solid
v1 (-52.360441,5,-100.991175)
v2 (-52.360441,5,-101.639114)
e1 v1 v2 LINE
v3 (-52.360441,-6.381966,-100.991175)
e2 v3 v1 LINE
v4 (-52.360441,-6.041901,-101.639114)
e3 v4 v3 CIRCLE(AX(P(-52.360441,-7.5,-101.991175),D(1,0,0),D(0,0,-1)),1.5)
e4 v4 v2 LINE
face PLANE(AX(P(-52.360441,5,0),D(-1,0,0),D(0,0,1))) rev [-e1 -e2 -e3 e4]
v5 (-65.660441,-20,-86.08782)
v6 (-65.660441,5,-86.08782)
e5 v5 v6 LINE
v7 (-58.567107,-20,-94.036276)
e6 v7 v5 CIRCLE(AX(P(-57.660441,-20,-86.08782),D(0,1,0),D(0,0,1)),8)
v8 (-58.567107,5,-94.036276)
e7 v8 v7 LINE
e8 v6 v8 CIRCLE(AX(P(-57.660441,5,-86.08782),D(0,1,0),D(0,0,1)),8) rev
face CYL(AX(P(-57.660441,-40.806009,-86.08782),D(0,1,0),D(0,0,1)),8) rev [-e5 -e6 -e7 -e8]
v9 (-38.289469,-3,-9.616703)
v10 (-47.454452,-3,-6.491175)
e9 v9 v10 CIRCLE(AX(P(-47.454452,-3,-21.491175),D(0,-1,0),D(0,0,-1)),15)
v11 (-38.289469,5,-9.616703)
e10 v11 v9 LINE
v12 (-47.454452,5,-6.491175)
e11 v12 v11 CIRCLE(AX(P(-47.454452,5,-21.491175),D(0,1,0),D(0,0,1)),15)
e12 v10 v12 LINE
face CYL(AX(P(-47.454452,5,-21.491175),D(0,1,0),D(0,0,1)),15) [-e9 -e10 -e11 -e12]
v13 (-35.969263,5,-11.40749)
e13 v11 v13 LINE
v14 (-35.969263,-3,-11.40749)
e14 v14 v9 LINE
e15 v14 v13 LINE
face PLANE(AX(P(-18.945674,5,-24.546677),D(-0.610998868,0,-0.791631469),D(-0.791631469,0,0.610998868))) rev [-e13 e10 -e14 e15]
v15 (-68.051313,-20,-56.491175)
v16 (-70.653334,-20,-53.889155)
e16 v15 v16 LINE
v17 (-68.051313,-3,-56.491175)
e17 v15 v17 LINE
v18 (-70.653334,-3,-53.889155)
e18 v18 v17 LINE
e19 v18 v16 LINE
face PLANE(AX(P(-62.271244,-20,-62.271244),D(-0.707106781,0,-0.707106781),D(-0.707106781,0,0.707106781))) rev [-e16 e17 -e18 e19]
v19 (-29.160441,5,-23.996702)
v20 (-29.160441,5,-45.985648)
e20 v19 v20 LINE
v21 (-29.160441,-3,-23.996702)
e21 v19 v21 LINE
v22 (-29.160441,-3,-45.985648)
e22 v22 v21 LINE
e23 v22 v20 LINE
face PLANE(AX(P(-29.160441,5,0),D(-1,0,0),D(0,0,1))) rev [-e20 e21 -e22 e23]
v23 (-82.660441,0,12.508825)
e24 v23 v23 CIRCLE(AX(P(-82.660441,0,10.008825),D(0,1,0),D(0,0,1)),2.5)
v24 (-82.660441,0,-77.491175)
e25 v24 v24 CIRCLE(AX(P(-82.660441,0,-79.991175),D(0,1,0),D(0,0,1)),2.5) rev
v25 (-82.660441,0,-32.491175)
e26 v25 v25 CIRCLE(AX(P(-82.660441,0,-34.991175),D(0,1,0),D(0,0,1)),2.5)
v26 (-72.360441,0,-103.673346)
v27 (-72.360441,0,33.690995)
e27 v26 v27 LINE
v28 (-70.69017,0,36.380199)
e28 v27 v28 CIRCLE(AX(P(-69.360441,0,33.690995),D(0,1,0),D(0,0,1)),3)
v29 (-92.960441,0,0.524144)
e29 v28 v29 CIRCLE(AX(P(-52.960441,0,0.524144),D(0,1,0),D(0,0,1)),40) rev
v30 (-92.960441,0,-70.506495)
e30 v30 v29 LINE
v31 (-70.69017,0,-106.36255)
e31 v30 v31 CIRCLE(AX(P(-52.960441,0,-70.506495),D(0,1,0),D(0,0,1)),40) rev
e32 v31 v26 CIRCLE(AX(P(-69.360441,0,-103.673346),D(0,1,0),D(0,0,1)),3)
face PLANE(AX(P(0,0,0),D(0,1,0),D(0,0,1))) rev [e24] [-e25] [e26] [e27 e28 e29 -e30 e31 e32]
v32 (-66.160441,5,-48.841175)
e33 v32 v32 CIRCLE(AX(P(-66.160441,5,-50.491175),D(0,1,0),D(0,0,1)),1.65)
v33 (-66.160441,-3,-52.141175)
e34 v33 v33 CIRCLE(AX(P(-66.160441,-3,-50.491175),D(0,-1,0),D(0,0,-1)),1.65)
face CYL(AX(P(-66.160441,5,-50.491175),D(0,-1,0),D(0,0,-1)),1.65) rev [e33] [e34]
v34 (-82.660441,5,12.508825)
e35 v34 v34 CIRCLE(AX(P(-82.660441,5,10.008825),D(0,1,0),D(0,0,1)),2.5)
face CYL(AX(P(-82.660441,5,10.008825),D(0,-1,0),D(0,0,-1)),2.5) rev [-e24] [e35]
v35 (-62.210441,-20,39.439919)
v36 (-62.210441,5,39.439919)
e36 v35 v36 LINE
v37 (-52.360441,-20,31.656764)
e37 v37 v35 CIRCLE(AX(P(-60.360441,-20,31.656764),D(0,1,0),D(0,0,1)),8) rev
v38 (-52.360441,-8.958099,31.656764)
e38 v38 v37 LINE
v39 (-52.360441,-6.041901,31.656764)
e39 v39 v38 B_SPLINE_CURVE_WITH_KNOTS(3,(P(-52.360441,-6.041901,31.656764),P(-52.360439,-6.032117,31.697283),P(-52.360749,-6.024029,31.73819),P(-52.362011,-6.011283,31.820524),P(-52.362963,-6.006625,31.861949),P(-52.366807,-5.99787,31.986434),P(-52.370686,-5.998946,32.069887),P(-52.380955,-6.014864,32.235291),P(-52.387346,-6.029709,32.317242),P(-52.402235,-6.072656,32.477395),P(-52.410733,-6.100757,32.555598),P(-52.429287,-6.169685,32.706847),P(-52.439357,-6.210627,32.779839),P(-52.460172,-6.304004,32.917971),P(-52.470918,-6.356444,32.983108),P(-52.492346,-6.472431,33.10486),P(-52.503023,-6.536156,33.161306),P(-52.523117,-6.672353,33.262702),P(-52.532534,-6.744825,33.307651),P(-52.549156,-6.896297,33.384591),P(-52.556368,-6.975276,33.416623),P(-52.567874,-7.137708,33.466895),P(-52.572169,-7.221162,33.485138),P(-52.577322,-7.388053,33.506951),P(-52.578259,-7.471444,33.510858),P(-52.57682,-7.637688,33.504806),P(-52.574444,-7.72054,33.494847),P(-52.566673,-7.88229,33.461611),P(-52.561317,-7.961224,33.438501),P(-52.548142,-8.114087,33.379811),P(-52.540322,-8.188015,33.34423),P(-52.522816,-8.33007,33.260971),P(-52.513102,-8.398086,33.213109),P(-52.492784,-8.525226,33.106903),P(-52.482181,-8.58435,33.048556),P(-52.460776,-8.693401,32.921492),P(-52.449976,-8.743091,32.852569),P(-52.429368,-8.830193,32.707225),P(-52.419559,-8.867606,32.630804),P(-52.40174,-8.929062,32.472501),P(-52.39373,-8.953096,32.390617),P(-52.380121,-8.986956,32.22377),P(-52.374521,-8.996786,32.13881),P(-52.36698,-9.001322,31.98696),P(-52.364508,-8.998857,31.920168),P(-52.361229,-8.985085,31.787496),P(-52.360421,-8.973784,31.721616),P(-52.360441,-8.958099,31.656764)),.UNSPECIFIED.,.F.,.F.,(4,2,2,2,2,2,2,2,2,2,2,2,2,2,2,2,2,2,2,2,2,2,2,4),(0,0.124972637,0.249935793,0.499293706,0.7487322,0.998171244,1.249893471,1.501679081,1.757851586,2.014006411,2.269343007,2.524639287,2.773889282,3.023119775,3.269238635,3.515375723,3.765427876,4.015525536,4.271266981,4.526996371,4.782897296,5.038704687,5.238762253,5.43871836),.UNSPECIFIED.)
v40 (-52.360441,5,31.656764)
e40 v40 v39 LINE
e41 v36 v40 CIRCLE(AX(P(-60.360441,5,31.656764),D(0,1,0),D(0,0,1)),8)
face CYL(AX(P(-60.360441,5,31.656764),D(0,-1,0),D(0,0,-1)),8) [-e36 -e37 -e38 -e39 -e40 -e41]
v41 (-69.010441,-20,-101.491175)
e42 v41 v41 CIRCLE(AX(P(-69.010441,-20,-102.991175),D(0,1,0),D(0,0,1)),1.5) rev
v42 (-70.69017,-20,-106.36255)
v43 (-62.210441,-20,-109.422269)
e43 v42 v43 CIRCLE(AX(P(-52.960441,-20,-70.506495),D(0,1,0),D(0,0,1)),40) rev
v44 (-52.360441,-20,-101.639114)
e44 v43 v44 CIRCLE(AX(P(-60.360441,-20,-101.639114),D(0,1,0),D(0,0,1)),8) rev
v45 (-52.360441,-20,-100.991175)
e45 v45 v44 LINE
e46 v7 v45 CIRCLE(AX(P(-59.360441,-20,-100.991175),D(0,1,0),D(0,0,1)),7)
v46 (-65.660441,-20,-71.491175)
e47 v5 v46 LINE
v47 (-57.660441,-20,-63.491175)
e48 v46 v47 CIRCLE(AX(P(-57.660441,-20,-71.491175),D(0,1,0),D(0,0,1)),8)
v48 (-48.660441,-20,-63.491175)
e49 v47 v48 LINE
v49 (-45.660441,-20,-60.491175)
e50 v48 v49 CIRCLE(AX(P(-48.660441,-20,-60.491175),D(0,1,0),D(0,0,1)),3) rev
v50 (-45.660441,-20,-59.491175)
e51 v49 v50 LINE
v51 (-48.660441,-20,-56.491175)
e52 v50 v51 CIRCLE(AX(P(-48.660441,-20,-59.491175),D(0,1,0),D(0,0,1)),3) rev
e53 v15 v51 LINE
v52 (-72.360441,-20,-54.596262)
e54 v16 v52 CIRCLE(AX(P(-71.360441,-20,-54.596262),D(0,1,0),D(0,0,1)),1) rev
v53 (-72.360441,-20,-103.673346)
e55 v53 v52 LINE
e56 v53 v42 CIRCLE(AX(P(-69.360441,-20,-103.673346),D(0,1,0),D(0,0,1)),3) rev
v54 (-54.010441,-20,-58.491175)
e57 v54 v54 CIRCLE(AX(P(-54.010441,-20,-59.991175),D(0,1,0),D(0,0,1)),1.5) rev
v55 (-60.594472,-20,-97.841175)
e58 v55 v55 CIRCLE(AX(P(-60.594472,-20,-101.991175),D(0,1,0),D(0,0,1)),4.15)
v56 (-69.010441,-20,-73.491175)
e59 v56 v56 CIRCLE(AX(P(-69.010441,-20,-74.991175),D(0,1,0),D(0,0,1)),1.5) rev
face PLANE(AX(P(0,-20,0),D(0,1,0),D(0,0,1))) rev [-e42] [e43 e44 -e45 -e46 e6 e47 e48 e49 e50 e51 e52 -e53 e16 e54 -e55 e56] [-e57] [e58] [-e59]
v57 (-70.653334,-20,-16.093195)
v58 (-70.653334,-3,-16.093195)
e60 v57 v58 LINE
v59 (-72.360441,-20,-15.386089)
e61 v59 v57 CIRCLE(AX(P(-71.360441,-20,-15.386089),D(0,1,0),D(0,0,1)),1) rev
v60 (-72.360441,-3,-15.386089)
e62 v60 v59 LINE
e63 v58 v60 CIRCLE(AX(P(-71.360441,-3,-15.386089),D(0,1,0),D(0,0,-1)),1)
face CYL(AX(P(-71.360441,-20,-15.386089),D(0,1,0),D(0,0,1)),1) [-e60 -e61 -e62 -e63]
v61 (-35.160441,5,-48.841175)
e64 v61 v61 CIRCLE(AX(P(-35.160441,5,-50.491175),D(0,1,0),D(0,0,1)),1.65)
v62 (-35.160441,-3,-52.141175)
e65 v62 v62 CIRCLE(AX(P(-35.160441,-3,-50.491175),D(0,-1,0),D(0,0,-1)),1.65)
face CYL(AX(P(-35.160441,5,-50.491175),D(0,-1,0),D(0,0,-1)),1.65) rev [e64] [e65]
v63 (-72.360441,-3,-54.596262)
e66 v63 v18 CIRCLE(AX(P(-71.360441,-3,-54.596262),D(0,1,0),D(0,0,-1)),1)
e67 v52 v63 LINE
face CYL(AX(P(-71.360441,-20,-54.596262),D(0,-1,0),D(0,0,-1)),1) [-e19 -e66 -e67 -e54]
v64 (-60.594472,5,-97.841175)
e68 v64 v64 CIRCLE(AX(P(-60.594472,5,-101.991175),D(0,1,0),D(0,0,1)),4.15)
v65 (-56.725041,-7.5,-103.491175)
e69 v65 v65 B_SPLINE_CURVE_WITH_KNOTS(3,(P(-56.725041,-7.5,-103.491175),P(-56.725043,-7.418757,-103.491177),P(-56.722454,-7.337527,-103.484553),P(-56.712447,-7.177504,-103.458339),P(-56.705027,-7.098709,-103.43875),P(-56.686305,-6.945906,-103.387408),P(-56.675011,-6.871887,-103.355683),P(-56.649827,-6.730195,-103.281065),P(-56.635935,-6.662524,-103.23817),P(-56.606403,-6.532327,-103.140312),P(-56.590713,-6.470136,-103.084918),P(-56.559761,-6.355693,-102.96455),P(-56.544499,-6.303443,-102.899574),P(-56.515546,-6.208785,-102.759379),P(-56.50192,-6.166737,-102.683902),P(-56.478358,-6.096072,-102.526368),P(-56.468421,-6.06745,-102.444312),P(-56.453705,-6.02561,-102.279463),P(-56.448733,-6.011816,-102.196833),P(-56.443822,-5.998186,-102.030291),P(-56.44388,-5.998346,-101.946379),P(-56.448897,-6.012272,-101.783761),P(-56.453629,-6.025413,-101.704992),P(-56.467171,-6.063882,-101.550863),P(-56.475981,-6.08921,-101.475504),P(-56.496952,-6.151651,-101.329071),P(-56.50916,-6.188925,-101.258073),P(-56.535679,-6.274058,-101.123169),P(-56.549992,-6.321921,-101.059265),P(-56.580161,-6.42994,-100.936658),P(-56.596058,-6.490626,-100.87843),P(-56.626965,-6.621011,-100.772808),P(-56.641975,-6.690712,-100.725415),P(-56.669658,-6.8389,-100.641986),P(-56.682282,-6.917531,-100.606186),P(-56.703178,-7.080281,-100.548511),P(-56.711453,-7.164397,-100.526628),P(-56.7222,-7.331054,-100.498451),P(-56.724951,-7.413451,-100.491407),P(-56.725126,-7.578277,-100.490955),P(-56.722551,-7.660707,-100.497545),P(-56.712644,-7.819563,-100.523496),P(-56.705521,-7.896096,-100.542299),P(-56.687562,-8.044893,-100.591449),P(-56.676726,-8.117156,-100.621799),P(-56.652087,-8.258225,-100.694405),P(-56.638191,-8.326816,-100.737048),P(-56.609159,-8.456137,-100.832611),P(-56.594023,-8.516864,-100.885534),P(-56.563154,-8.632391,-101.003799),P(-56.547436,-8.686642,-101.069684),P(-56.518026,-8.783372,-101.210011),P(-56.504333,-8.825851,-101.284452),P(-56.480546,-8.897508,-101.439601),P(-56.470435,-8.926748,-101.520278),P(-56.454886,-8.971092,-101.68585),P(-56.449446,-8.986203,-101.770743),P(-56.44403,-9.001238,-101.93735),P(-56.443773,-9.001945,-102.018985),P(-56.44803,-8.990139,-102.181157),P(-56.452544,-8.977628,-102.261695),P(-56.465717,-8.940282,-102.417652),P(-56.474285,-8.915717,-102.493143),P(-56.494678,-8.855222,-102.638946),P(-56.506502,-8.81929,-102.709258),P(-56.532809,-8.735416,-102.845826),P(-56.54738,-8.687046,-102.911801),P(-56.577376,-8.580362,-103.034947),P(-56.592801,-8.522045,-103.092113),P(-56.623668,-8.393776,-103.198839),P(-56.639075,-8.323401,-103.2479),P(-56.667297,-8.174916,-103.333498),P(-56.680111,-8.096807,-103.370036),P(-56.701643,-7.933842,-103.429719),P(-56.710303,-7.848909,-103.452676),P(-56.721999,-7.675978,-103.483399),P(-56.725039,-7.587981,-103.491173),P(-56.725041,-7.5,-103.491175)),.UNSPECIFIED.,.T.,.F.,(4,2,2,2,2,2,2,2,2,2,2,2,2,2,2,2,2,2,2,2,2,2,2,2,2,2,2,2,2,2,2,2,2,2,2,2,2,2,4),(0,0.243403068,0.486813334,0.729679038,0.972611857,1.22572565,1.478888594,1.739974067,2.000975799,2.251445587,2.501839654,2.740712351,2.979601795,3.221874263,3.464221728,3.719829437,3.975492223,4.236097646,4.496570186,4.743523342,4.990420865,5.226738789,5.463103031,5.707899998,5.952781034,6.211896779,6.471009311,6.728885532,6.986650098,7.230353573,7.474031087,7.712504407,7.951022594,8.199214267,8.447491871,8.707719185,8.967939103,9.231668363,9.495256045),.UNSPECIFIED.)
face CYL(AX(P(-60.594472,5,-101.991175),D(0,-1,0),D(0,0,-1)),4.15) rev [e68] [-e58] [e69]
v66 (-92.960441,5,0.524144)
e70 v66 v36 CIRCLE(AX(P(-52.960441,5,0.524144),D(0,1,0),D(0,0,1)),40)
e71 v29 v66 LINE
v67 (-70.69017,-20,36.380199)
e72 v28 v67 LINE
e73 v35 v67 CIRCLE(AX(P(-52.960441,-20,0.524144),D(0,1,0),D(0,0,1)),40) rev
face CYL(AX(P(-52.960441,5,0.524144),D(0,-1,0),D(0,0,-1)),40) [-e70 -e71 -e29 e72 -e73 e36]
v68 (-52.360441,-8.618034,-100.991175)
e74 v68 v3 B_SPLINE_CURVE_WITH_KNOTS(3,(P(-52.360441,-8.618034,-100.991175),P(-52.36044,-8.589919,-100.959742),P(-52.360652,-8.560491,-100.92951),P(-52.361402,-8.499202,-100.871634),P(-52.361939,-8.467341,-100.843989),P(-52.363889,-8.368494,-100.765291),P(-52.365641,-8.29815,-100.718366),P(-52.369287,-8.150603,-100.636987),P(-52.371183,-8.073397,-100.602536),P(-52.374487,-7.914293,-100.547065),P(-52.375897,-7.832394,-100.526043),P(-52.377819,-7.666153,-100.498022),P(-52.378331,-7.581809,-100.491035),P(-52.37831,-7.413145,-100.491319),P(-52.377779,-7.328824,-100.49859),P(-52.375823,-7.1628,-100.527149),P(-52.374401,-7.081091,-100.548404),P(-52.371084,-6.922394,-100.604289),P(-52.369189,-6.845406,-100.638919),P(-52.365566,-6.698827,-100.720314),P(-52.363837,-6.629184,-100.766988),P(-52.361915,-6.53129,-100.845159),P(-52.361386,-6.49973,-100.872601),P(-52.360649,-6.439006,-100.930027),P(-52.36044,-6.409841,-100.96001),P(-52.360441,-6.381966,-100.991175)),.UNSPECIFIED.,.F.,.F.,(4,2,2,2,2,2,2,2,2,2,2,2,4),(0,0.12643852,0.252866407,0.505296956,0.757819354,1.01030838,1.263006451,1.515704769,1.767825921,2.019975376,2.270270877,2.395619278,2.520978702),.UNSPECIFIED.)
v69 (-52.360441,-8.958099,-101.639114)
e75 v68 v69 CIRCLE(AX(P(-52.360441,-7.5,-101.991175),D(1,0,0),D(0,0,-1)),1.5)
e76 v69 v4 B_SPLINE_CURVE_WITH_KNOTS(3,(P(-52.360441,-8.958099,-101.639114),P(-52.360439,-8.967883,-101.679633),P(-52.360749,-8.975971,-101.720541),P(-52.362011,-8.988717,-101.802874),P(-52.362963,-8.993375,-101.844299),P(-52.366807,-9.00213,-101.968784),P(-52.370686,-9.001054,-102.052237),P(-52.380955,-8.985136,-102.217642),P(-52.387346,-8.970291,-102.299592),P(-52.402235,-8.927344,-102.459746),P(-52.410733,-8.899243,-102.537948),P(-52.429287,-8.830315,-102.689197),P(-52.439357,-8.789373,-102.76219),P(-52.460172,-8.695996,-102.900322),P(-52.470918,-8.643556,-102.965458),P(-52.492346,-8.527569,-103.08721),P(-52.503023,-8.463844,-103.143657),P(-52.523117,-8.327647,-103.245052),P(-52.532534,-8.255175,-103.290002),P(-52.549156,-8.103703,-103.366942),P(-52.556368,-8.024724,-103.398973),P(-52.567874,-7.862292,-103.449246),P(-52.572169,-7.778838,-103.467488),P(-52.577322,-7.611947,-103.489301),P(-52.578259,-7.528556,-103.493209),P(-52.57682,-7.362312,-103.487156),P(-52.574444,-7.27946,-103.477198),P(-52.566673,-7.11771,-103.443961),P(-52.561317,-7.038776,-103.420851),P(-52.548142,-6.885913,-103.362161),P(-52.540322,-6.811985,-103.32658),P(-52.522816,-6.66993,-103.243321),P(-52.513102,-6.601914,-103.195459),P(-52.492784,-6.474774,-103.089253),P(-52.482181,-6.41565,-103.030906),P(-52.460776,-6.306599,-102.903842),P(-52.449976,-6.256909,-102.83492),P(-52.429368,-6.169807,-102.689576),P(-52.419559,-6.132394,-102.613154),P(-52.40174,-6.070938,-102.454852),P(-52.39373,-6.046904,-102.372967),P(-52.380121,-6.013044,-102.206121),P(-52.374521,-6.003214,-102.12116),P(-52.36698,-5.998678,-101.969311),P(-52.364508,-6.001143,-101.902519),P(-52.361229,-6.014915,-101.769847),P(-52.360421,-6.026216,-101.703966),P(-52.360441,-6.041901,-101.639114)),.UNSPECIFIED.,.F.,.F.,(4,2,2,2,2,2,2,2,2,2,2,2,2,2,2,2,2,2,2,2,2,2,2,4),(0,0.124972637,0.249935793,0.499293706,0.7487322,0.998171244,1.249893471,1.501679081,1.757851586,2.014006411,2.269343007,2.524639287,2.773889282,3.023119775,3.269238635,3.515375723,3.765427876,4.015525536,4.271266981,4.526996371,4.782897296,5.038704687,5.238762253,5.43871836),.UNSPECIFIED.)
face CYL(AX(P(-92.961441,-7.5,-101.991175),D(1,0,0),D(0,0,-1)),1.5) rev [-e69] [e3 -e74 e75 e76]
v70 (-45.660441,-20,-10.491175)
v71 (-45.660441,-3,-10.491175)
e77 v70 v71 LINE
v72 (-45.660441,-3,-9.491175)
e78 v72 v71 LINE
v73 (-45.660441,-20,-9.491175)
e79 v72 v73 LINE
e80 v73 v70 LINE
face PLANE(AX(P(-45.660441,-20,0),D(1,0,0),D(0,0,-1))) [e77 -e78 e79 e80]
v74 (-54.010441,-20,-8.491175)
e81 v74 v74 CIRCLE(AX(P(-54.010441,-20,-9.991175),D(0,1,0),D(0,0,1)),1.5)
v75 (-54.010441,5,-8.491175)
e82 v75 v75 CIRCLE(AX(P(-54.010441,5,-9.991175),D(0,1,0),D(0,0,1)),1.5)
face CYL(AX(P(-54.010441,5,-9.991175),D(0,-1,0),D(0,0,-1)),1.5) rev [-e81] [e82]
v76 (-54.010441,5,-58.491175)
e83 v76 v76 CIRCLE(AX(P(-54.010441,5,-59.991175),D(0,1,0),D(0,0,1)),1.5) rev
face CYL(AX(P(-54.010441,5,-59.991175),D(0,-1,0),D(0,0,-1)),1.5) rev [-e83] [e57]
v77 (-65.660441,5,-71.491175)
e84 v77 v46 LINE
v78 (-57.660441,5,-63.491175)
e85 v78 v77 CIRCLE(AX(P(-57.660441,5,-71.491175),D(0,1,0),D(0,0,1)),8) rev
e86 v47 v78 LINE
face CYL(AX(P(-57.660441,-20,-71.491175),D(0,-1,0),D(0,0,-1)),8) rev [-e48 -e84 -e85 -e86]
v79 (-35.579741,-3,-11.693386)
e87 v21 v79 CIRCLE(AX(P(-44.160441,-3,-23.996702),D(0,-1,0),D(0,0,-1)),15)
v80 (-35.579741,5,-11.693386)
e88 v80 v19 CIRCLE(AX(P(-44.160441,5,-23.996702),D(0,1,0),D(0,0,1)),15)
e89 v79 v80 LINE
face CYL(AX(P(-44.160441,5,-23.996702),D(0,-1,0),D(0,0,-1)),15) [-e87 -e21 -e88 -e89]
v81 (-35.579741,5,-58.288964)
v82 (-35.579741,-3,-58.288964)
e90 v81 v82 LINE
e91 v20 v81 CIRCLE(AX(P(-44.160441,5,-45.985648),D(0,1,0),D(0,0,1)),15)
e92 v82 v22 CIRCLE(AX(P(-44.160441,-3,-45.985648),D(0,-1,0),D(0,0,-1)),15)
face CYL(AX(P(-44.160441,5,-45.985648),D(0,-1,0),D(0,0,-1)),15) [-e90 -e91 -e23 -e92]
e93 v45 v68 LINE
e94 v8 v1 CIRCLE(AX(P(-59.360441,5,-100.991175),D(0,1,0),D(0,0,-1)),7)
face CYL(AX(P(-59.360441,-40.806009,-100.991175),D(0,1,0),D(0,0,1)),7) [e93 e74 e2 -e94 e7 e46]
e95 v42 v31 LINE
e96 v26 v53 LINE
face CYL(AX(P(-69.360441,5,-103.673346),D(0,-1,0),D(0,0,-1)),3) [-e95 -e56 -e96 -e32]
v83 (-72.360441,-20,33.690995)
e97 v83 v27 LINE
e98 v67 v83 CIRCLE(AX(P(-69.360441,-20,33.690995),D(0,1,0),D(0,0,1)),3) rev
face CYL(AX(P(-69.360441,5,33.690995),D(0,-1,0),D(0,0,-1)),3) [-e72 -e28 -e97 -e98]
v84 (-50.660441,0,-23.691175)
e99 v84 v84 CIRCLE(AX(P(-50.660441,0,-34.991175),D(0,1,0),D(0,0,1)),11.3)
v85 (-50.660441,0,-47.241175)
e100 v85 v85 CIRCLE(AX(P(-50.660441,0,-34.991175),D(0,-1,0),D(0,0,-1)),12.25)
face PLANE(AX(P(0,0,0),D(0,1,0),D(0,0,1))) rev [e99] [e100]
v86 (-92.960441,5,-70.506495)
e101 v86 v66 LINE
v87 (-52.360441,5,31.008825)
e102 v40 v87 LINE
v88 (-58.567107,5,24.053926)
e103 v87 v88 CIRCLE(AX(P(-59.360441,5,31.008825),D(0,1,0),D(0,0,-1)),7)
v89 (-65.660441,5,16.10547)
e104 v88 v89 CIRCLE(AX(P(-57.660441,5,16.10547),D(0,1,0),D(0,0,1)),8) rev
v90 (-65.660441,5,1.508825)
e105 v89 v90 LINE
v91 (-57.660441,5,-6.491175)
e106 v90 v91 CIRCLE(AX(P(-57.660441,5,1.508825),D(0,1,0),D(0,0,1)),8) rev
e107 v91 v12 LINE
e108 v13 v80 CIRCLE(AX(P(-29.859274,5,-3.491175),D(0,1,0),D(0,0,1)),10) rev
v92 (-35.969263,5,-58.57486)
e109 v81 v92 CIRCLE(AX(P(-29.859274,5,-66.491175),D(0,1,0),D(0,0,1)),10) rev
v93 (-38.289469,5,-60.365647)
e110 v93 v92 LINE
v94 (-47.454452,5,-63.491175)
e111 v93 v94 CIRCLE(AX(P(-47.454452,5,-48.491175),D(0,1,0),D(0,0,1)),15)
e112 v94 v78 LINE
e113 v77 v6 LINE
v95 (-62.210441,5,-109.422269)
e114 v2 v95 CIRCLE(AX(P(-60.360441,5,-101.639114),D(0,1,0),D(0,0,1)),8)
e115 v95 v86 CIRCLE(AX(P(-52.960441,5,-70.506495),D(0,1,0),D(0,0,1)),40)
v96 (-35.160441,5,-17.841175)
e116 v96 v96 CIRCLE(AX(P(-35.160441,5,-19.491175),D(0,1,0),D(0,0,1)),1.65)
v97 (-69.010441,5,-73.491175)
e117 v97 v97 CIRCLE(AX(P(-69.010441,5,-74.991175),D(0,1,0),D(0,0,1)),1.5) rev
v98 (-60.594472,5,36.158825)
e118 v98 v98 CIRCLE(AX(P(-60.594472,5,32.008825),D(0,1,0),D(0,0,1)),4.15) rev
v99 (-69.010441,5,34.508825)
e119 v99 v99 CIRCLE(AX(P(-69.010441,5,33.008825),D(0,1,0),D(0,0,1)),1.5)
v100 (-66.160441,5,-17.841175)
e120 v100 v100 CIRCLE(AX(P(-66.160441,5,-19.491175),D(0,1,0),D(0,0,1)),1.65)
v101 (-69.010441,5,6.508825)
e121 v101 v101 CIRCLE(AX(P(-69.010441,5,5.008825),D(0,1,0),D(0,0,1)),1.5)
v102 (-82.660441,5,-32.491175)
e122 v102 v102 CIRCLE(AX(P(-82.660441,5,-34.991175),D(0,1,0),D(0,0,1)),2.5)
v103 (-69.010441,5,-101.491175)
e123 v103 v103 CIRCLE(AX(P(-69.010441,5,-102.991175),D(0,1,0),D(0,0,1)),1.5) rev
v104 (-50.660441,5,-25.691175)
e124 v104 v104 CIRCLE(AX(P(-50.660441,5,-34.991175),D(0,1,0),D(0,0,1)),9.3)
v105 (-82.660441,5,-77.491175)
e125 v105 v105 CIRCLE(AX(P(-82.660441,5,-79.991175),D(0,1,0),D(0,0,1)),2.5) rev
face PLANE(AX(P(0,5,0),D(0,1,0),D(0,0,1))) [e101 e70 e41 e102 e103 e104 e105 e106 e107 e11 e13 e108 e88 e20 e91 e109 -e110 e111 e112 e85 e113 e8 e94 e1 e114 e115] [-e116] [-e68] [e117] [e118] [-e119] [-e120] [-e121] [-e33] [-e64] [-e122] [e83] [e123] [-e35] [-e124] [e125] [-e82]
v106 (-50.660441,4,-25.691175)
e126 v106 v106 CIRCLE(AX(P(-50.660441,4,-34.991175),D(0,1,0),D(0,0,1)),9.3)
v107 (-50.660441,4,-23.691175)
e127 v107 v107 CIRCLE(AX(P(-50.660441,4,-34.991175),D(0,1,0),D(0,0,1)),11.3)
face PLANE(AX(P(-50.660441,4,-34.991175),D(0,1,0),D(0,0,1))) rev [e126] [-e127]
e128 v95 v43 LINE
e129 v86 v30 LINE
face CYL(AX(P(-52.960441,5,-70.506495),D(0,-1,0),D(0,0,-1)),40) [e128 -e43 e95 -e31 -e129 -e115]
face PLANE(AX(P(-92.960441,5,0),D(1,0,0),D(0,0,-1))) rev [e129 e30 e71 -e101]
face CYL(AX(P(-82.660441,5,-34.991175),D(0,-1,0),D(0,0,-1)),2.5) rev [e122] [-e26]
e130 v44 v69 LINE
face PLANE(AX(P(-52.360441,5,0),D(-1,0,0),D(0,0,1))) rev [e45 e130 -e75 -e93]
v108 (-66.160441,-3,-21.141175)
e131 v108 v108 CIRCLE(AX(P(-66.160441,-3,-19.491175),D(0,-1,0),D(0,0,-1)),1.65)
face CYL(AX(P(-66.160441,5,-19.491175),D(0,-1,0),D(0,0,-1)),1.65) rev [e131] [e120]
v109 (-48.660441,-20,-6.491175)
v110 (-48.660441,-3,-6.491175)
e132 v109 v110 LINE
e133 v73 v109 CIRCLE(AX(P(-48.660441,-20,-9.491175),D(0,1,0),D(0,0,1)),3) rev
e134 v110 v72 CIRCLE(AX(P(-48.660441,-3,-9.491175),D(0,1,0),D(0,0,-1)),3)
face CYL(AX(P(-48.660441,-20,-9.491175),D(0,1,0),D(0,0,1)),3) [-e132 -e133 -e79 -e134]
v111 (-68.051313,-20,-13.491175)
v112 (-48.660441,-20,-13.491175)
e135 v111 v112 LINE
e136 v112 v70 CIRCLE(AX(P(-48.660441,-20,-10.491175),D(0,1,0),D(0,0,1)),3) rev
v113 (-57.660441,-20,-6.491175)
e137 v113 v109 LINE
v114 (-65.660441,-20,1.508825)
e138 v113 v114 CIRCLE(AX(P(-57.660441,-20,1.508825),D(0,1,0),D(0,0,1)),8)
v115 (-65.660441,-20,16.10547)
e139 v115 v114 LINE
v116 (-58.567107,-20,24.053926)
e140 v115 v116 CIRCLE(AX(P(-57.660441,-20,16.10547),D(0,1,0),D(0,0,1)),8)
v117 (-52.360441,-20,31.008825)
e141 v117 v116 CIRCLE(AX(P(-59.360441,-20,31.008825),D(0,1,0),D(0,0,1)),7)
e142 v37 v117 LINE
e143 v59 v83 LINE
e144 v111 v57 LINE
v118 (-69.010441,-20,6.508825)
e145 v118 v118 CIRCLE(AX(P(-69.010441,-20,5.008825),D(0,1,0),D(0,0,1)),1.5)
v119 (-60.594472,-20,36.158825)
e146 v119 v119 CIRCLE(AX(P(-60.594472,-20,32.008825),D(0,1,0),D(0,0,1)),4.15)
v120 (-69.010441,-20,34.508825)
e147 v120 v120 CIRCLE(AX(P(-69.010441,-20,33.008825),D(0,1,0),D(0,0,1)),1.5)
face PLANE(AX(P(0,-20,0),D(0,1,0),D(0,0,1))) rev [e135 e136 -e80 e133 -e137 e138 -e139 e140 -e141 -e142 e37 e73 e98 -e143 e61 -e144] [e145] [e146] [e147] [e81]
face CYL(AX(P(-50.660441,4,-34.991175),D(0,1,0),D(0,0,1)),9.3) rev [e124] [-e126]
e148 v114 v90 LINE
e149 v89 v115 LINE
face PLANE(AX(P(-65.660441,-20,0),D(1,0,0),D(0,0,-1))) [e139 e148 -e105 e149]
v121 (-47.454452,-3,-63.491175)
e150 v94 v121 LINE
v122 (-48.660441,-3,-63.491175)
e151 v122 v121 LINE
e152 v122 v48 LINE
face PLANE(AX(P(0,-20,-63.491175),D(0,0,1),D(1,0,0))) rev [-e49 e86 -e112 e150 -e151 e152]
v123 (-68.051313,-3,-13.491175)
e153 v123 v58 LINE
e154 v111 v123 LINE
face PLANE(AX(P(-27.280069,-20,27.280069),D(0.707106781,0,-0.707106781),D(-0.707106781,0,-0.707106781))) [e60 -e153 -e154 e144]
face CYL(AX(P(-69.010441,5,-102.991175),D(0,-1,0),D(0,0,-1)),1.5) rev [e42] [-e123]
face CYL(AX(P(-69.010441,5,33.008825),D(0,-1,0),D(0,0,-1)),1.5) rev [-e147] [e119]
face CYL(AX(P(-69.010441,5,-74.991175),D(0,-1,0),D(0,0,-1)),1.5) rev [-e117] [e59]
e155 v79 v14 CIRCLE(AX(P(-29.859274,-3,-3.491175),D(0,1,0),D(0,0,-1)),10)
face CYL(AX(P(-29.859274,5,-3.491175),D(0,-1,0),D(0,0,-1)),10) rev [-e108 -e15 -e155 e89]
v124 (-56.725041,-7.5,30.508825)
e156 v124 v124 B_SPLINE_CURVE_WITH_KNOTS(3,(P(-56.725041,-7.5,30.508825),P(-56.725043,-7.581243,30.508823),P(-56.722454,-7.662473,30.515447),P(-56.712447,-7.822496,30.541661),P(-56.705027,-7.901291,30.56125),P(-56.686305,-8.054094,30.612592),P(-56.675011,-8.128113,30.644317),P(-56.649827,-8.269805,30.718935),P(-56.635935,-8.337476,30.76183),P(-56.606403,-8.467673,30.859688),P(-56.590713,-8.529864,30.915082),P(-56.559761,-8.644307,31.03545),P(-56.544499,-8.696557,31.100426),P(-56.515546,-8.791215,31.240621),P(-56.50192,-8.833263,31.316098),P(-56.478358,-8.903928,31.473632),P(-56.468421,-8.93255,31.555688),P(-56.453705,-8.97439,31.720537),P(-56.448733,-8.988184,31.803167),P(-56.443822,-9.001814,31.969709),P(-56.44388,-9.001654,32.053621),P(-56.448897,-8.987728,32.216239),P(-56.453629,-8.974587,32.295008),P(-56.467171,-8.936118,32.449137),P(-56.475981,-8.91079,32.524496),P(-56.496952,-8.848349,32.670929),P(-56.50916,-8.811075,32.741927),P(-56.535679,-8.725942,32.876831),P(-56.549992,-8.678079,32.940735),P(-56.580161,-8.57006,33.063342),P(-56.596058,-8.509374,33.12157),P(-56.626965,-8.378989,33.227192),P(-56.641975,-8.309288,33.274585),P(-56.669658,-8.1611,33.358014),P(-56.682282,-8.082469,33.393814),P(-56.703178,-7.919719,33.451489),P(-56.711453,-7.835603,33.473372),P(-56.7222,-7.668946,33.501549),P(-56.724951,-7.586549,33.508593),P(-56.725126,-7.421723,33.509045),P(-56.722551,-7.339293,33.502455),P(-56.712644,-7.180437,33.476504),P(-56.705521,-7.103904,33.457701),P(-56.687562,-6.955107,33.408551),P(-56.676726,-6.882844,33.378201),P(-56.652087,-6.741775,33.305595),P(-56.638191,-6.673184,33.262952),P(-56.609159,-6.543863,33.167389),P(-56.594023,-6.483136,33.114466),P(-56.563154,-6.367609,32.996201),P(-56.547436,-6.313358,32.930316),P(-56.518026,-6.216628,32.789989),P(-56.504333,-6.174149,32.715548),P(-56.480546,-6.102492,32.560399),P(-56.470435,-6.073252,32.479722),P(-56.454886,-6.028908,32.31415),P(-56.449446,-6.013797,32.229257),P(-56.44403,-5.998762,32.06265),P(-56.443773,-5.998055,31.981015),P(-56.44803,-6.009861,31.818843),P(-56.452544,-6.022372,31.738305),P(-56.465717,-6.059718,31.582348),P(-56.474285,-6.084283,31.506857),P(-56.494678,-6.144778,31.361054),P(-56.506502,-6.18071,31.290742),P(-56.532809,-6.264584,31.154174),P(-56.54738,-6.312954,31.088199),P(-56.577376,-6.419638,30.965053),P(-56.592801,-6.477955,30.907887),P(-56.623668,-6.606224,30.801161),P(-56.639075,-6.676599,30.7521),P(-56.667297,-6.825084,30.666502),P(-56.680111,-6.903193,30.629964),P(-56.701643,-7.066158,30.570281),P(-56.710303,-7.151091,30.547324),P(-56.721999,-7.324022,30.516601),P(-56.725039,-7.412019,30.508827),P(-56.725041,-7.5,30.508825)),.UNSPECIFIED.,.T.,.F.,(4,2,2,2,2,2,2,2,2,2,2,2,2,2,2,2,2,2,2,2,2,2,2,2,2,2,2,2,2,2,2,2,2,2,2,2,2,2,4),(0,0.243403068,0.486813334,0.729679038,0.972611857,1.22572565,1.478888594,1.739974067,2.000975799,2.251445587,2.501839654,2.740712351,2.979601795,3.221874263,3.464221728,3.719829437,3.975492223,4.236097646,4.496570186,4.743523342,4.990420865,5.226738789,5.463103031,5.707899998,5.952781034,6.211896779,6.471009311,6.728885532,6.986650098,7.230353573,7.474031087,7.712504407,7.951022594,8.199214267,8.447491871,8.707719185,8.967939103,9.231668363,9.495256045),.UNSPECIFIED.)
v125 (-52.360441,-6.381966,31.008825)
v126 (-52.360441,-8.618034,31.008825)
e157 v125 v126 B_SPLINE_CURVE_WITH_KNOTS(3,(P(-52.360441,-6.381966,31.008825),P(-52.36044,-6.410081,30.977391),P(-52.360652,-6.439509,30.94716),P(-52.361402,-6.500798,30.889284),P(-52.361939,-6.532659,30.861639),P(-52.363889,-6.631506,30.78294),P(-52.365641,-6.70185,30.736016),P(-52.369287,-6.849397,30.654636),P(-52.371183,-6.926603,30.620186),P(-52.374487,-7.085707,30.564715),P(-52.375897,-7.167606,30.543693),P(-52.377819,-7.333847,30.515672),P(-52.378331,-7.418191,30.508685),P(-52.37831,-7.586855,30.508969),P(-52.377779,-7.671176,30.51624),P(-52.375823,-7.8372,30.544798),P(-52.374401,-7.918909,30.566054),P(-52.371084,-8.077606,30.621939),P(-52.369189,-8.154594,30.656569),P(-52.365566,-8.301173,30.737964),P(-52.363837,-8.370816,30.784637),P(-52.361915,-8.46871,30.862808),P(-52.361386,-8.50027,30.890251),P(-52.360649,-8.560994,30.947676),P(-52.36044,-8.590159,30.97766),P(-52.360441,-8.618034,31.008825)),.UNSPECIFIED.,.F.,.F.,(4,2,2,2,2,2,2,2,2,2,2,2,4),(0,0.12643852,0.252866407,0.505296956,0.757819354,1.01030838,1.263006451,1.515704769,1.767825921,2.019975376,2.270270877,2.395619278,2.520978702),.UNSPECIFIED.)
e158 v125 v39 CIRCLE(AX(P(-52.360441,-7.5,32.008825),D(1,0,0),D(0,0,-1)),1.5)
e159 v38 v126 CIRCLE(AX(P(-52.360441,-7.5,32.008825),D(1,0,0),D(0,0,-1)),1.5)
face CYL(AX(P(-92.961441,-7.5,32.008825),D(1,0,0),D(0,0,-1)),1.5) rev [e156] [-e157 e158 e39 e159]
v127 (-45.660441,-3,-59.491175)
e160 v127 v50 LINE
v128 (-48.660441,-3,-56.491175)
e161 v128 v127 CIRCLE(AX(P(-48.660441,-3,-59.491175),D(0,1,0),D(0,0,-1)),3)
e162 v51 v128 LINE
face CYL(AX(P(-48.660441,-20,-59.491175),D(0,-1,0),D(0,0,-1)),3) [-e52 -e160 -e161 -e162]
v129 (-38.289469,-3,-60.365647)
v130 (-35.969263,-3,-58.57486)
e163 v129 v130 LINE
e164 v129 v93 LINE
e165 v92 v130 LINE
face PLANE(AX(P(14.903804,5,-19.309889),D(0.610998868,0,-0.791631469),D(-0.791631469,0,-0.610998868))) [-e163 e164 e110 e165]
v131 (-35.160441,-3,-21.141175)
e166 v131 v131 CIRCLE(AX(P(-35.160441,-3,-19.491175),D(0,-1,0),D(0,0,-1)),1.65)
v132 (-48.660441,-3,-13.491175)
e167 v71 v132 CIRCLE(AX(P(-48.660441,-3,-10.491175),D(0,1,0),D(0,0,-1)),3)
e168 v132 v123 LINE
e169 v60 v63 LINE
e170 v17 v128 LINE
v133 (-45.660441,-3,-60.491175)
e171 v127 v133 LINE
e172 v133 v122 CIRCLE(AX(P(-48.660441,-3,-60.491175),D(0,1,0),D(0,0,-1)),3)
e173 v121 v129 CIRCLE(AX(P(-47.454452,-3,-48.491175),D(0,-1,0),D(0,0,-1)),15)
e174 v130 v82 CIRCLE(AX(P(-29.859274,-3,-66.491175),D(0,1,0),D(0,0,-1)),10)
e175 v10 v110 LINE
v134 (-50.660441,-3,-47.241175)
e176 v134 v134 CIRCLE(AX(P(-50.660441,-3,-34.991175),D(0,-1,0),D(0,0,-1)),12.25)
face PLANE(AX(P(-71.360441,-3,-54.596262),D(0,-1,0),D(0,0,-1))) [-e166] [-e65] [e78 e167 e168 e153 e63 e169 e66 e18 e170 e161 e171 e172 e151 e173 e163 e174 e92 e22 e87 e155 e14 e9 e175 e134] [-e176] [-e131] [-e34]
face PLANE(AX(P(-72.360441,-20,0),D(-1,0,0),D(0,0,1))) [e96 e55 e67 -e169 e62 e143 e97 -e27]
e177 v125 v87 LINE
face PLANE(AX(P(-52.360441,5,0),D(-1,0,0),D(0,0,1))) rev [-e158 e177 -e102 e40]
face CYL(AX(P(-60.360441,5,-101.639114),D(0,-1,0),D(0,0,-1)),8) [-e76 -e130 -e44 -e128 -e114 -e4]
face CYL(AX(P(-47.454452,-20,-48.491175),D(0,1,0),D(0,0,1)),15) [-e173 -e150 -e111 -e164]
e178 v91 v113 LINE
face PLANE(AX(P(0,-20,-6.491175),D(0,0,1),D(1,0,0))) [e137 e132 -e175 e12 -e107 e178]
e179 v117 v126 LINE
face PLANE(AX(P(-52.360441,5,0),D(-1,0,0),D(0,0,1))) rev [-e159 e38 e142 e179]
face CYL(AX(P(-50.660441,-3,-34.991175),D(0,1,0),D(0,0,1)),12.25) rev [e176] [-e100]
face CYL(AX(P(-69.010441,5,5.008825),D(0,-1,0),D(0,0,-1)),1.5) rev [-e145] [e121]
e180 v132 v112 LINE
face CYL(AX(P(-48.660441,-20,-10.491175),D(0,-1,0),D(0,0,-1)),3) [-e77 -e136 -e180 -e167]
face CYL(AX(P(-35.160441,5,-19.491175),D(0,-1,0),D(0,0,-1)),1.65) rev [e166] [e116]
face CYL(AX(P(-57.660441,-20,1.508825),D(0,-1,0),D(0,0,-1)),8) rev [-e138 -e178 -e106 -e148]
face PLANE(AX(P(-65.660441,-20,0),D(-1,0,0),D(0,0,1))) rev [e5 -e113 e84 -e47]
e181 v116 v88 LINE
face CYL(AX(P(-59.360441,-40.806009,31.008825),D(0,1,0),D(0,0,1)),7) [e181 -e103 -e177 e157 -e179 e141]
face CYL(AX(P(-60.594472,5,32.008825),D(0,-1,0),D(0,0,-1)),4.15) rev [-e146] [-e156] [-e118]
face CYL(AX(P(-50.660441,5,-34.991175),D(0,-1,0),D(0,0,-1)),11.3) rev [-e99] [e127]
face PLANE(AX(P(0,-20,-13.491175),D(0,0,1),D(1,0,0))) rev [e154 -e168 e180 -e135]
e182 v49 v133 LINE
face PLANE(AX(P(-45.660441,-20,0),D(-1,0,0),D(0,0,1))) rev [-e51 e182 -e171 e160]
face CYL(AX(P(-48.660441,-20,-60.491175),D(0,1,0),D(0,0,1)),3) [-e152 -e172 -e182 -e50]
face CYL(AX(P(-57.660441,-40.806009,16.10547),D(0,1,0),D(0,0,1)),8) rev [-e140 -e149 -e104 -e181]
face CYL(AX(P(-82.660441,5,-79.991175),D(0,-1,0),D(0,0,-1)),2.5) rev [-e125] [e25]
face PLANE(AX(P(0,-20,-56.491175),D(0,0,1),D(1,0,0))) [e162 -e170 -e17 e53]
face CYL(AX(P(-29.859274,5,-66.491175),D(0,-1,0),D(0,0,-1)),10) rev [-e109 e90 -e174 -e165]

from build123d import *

# Parameters (mm, degrees)
SZKIC2_R                        = 1.65
SZKIC2_R_2                      = 11.3
SZKIC2_W                        = 13.3
SZKIC2_H                        = 7
SZKIC2_R_3                      = 1.5
SZKIC2_W_2                      = 6.7
SZKIC2_R_4                      = 4.15
SZKIC2_R_5                      = 2.5
DODANIE_WYCI_GNI_CIE1_DEPTH     = 5
DODANIE_WYCI_GNI_CIE2_START     = -20
SZKIC2_3_R                      = 1.5
DODANIE_WYCI_GNI_CIE2_DEPTH     = 20
ZAOKR_GLENIE1_R                 = 7
SZKIC3_R                        = 4.15
DODANIE_WYCI_GNI_CIE3_DEPTH     = 20
ZAOKR_GLENIE2_R                 = 3
ZAOKR_GLENIE3_R                 = 10
WYTNIJ_WYCI_GNI_CIE1_DEPTH      = 146.394986561
ZAOKR_GLENIE4_R                 = 15
ZAOKR_GLENIE5_R                 = 1
ZAOKR_GLENIE6_R                 = 40
ZAOKR_GLENIE7_R                 = 3
ZAOKR_GLENIE10_R                = 8
ZAOKR_GLENIE11_R                = 8
DODANIE_WYCI_GNI_CIE4_START     = -1
SZKIC6_R                        = 11.3
SZKIC6_R_2                      = 9.3
DODANIE_WYCI_GNI_CIE4_DEPTH     = 1
SZKIC7_R                        = 12.25
SZKIC7_R_2                      = 1.65
DODANIE_WYCI_GNI_CIE5_DEPTH     = 3
WYTNIJ_WYCI_GNI_CIE4_REACH      = 120.613
WYTNIJ_WYCI_GNI_CIE4_END_RADIUS = 4.15
SZKIC9_R                        = 1.5
WYTNIJ_WYCI_GNI_CIE5_REACH      = 120.613
WYTNIJ_WYCI_GNI_CIE5_END_RADIUS = 4.15
SZKIC9_3_R                      = 1.5


with BuildPart() as part:
    # Szkic2 → Dodanie-wyciągnięcie1 (new body)
    # profile 1 of 14: a face of its own
    with BuildSketch(Plane(origin=(0, 0, 0), x_dir=(1, 0, 0), z_dir=(0, 1, 0))):
        Polygon((-68.051313495, 13.491175162), (-65.66044053, 13.491175162), (-52.36044053, 13.491175162), (-45.66044053, 13.491175162), (-33.269567565, 13.491175162), (-29.16044053, 13.491175162), (-29.16044053, 17.600302197), (-29.16044053, 52.382048128), (-29.16044053, 56.491175162), (-33.269567565, 56.491175162), (-45.66044053, 56.491175162), (-52.36044053, 56.491175162), (-65.66044053, 56.491175162), (-68.051313495, 56.491175162), (-72.36044053, 52.182048128), (-72.36044053, 17.800302197), align=None)
        with Locations(Location((-66.16044053, 19.491175162, 0), (0, 0, 270))):
            Circle(SZKIC2_R, mode=Mode.SUBTRACT)
        with Locations(Location((-50.66044053, 34.991175162, 0), (0, 0, 270))):
            Circle(SZKIC2_R_2, mode=Mode.SUBTRACT)
        with Locations(Location((-35.16044053, 19.491175162, 0), (0, 0, 270))):
            Circle(SZKIC2_R, mode=Mode.SUBTRACT)
        with Locations(Location((-66.16044053, 50.491175162, 0), (0, 0, 270))):
            Circle(SZKIC2_R, mode=Mode.SUBTRACT)
        with Locations(Location((-35.16044053, 50.491175162, 0), (0, 0, 270))):
            Circle(SZKIC2_R, mode=Mode.SUBTRACT)
    # profile 2 of 14: a face of its own
    with BuildSketch(Plane(origin=(0, 0, 0), x_dir=(1, 0, 0), z_dir=(0, 1, 0))):
        with Locations((-59.01044053, 9.991175162)):
            Rectangle(SZKIC2_W, SZKIC2_H)
        with Locations(Location((-54.01044053, 9.991175162, 0), (0, 0, 270))):
            Circle(SZKIC2_R_3, mode=Mode.SUBTRACT)
    # profile 3 of 14: a face of its own
    with BuildSketch(Plane(origin=(0, 0, 0), x_dir=(1, 0, 0), z_dir=(0, 1, 0))):
        Polygon((-65.66044053, 6.491175162), (-65.66044053, 13.491175162), (-68.051313495, 13.491175162), (-72.36044053, 17.800302197), (-72.36044053, -11.508824838), (-72.36044053, -40.008824838), (-65.66044053, -40.008824838), (-65.66044053, -11.508824838), align=None)
        with Locations(Location((-69.01044053, -33.008824838, 0), (0, 0, 270))):
            Circle(SZKIC2_R_3, mode=Mode.SUBTRACT)
        with Locations(Location((-69.01044053, -5.008824838, 0), (0, 0, 270))):
            Circle(SZKIC2_R_3, mode=Mode.SUBTRACT)
    # profile 4 of 14: a face of its own
    with BuildSketch(Plane(origin=(0, 0, 0), x_dir=(1, 0, 0), z_dir=(0, 1, 0))):
        with Locations((-49.01044053, 9.991175162)):
            Rectangle(SZKIC2_W_2, SZKIC2_H)
    # profile 5 of 14: a face of its own
    with BuildSketch(Plane(origin=(0, 0, 0), x_dir=(1, 0, 0), z_dir=(0, 1, 0))):
        Polygon((-52.36044053, 6.491175162), (-65.66044053, 6.491175162), (-65.66044053, -11.508824838), (-52.36044053, -1.243587456), align=None)
    # profile 6 of 14: a face of its own
    with BuildSketch(Plane(origin=(0, 0, 0), x_dir=(1, 0, 0), z_dir=(0, 1, 0))):
        Polygon((-33.269567565, 13.491175162), (-45.66044053, 13.491175162), (-45.66044053, 6.491175162), (-52.36044053, 6.491175162), (-52.36044053, -1.243587456), align=None)
    # profile 7 of 14: a face of its own
    with BuildSketch(Plane(origin=(0, 0, 0), x_dir=(1, 0, 0), z_dir=(0, 1, 0))):
        Polygon((-52.36044053, -1.243587456), (-65.66044053, -11.508824838), (-65.66044053, -40.008824838), (-52.36044053, -40.008824838), align=None)
        with Locations(Location((-60.594472333, -32.008824838, 0), (0, 0, 270))):
            Circle(SZKIC2_R_4, mode=Mode.SUBTRACT)
    # profile 8 of 14: a face of its own
    with BuildSketch(Plane(origin=(0, 0, 0), x_dir=(1, 0, 0), z_dir=(0, 1, 0))):
        Polygon((-72.36044053, -11.508824838), (-72.36044053, 17.800302197), (-72.36044053, 52.182048128), (-72.36044053, 81.491175162), (-72.36044053, 109.991175162), (-92.96044053, 109.991175162), (-92.96044053, 81.491175162), (-92.96044053, -11.508824838), (-92.96044053, -40.008824838), (-72.36044053, -40.008824838), align=None)
        with Locations(Location((-82.66044053, -10.008824838, 0), (0, 0, 270))):
            Circle(SZKIC2_R_5, mode=Mode.SUBTRACT)
        with Locations(Location((-82.66044053, 34.991175162, 0), (0, 0, 270))):
            Circle(SZKIC2_R_5, mode=Mode.SUBTRACT)
        with Locations(Location((-82.66044053, 79.991175162, 0), (0, 0, 270))):
            Circle(SZKIC2_R_5, mode=Mode.SUBTRACT)
    # profile 9 of 14: a face of its own
    with BuildSketch(Plane(origin=(0, 0, 0), x_dir=(1, 0, 0), z_dir=(0, 1, 0))):
        Polygon((-72.36044053, 81.491175162), (-72.36044053, 52.182048128), (-68.051313495, 56.491175162), (-65.66044053, 56.491175162), (-65.66044053, 63.491175162), (-65.66044053, 81.491175162), (-65.66044053, 109.991175162), (-72.36044053, 109.991175162), align=None)
        with Locations(Location((-69.01044053, 74.991175162, 0), (0, 0, 270))):
            Circle(SZKIC2_R_3, mode=Mode.SUBTRACT)
        with Locations(Location((-69.01044053, 102.991175162, 0), (0, 0, 270))):
            Circle(SZKIC2_R_3, mode=Mode.SUBTRACT)
    # profile 10 of 14: a face of its own
    with BuildSketch(Plane(origin=(0, 0, 0), x_dir=(1, 0, 0), z_dir=(0, 1, 0))):
        with Locations((-59.01044053, 59.991175162)):
            Rectangle(SZKIC2_W, SZKIC2_H)
        with Locations(Location((-54.01044053, 59.991175162, 0), (0, 0, 270))):
            Circle(SZKIC2_R_3, mode=Mode.SUBTRACT)
    # profile 11 of 14: a face of its own
    with BuildSketch(Plane(origin=(0, 0, 0), x_dir=(1, 0, 0), z_dir=(0, 1, 0))):
        with Locations((-49.01044053, 59.991175162)):
            Rectangle(SZKIC2_W_2, SZKIC2_H)
    # profile 12 of 14: a face of its own
    with BuildSketch(Plane(origin=(0, 0, 0), x_dir=(1, 0, 0), z_dir=(0, 1, 0))):
        Polygon((-65.66044053, 81.491175162), (-65.66044053, 63.491175162), (-52.36044053, 63.491175162), (-52.36044053, 71.22593778), align=None)
    # profile 13 of 14: a face of its own
    with BuildSketch(Plane(origin=(0, 0, 0), x_dir=(1, 0, 0), z_dir=(0, 1, 0))):
        Polygon((-52.36044053, 109.991175162), (-65.66044053, 109.991175162), (-65.66044053, 81.491175162), (-52.36044053, 71.22593778), align=None)
        with Locations(Location((-60.594472333, 101.991175162, 0), (0, 0, 270))):
            Circle(SZKIC2_R_4, mode=Mode.SUBTRACT)
    # profile 14 of 14: a face of its own
    with BuildSketch(Plane(origin=(0, 0, 0), x_dir=(1, 0, 0), z_dir=(0, 1, 0))):
        Polygon((-45.66044053, 63.491175162), (-45.66044053, 56.491175162), (-33.269567565, 56.491175162), (-52.36044053, 71.22593778), (-52.36044053, 63.491175162), align=None)
    extrude(amount=DODANIE_WYCI_GNI_CIE1_DEPTH)

    # Szkic2<3> → Dodanie-wyciągnięcie2 (add)
    # profile 1 of 2: a face of its own
    with BuildSketch(Plane(origin=(0, 0, 0), x_dir=(1, 0, 0), z_dir=(0, 1, 0)).offset(DODANIE_WYCI_GNI_CIE2_START)):
        Polygon((-68.051313495, 13.491175162), (-72.36044053, 17.800302197), (-72.36044053, -40.008824838), (-65.66044053, -40.008824838), (-65.66044053, 6.491175162), (-45.66044053, 6.491175162), (-45.66044053, 13.491175162), align=None)
        with Locations(Location((-54.01044053, 9.991175162, 0), (0, 0, 270))):
            Circle(SZKIC2_3_R, mode=Mode.SUBTRACT)
        with Locations(Location((-69.01044053, -5.008824838, 0), (0, 0, 270))):
            Circle(SZKIC2_3_R, mode=Mode.SUBTRACT)
        with Locations(Location((-69.01044053, -33.008824838, 0), (0, 0, 270))):
            Circle(SZKIC2_3_R, mode=Mode.SUBTRACT)
    # profile 2 of 2: a face of its own
    with BuildSketch(Plane(origin=(0, 0, 0), x_dir=(1, 0, 0), z_dir=(0, 1, 0)).offset(DODANIE_WYCI_GNI_CIE2_START)):
        Polygon((-72.36044053, 109.991175162), (-72.36044053, 52.182048128), (-68.051313495, 56.491175162), (-45.66044053, 56.491175162), (-45.66044053, 63.491175162), (-65.66044053, 63.491175162), (-65.66044053, 109.991175162), align=None)
        with Locations(Location((-69.01044053, 74.991175162, 0), (0, 0, 270))):
            Circle(SZKIC2_3_R, mode=Mode.SUBTRACT)
        with Locations(Location((-69.01044053, 102.991175162, 0), (0, 0, 270))):
            Circle(SZKIC2_3_R, mode=Mode.SUBTRACT)
        with Locations(Location((-54.01044053, 59.991175162, 0), (0, 0, 270))):
            Circle(SZKIC2_3_R, mode=Mode.SUBTRACT)
    extrude(amount=DODANIE_WYCI_GNI_CIE2_DEPTH)

    # Zaokrąglenie1
    zaokr_glenie1_edges = [part.edges().sort_by_distance(p)[0] for p in [
        (-52.36044053, 2.5, 40.008824838),
        (-52.36044053, 2.5, -109.991175162),
    ]]
    fillet(zaokr_glenie1_edges, radius=ZAOKR_GLENIE1_R)

    # Szkic3 → Dodanie-wyciągnięcie3 (add)
    # profile 1 of 2: a face of its own
    with BuildSketch(Plane.XZ):
        with BuildLine():
            Line((-65.66044053, -109.991175162), (-59.36044053, -109.991175162))
            ThreePointArc((-59.36044053, -109.991175162), (-54.410693062, -107.940922631), (-52.36044053, -102.991175162))
            Line((-52.36044053, -102.991175162), (-52.36044053, -100.991175162))
            ThreePointArc((-52.36044053, -100.991175162), (-54.410693062, -96.041427694), (-59.36044053, -93.991175162))
            Line((-59.36044053, -93.991175162), (-65.66044053, -93.991175162))
            Line((-65.66044053, -93.991175162), (-65.66044053, -109.991175162))
        make_face()
        with Locations(Location((-60.594472333, -101.991175162, 0), (0, 0, 90))):
            Circle(SZKIC3_R, mode=Mode.SUBTRACT)
    # profile 2 of 2: a face of its own
    with BuildSketch(Plane.XZ):
        with BuildLine():
            Line((-65.66044053, 40.008824838), (-59.36044053, 40.008824838))
            ThreePointArc((-59.36044053, 40.008824838), (-54.410693062, 37.958572306), (-52.36044053, 33.008824838))
            Line((-52.36044053, 33.008824838), (-52.36044053, 31.008824838))
            ThreePointArc((-52.36044053, 31.008824838), (-54.410693062, 26.059077369), (-59.36044053, 24.008824838))
            Line((-59.36044053, 24.008824838), (-65.66044053, 24.008824838))
            Line((-65.66044053, 24.008824838), (-65.66044053, 40.008824838))
        make_face()
        with Locations(Location((-60.594472333, 32.008824838, 0), (0, 0, 90))):
            Circle(SZKIC3_R, mode=Mode.SUBTRACT)
    extrude(amount=DODANIE_WYCI_GNI_CIE3_DEPTH)

    # Zaokrąglenie2
    zaokr_glenie2_edges = [part.edges().sort_by_distance(p)[0] for p in [
        (-45.66044053, -10, -63.491175162),
        (-45.66044053, -10, -56.491175162),
        (-45.66044053, -10, -13.491175162),
        (-45.66044053, -10, -6.491175162),
    ]]
    fillet(zaokr_glenie2_edges, radius=ZAOKR_GLENIE2_R)

    # Zaokrąglenie3
    zaokr_glenie3_edges = [part.edges().sort_by_distance(p)[0] for p in [
        (-33.269567565, 2.5, -56.491175162),
        (-33.269567565, 2.5, -13.491175162),
    ]]
    fillet(zaokr_glenie3_edges, radius=ZAOKR_GLENIE3_R)

    # Szkic4 → Wytnij-wyciągnięcie1 (cut, through all)
    with BuildSketch(Plane.XZ):
        with BuildLine():
            Line((-52.36044053, 31.008824838), (-52.36044053, 1.243587456))
            Line((-52.36044053, 1.243587456), (-42.339011995, -6.491175162))
            Line((-42.339011995, -6.491175162), (-48.66044053, -6.491175162))
            Line((-48.66044053, -6.491175162), (-65.66044053, -6.491175162))
            Line((-65.66044053, -6.491175162), (-65.66044053, 24.008824838))
            Line((-65.66044053, 24.008824838), (-59.36044053, 24.008824838))
            ThreePointArc((-59.36044053, 24.008824838), (-54.410693062, 26.059077369), (-52.36044053, 31.008824838))
        make_face()
        with BuildLine():
            Line((-52.36044053, -71.22593778), (-52.36044053, -100.991175162))
            ThreePointArc((-52.36044053, -100.991175162), (-54.410693062, -96.041427694), (-59.36044053, -93.991175162))
            Line((-59.36044053, -93.991175162), (-65.66044053, -93.991175162))
            Line((-65.66044053, -93.991175162), (-65.66044053, -63.491175162))
            Line((-65.66044053, -63.491175162), (-48.66044053, -63.491175162))
            Line((-48.66044053, -63.491175162), (-42.339011995, -63.491175162))
            Line((-42.339011995, -63.491175162), (-52.36044053, -71.22593778))
        make_face()
    extrude(amount=-WYTNIJ_WYCI_GNI_CIE1_DEPTH, mode=Mode.SUBTRACT)

    # Zaokrąglenie4
    zaokr_glenie4_edges = [part.edges().sort_by_distance(p)[0] for p in [
        (-29.16044053, 2.5, -56.491175162),
        (-29.16044053, 2.5, -13.491175162),
        (-42.339011995, 2.5, -63.491175162),
        (-42.339011995, 2.5, -6.491175162),
    ]]
    fillet(zaokr_glenie4_edges, radius=ZAOKR_GLENIE4_R)

    # Zaokrąglenie5
    zaokr_glenie5_edges = [part.edges().sort_by_distance(p)[0] for p in [
        (-72.36044053, -10, -52.182048128),
        (-72.36044053, -10, -17.800302197),
    ]]
    fillet(zaokr_glenie5_edges, radius=ZAOKR_GLENIE5_R)

    # Zaokrąglenie6
    # the kernel refuses this fillet: 40 mm, written as the material it takes off along each edge
    with BuildSketch(Plane(origin=(-92.96044053, -98.711701434, -109.991175162), x_dir=(0, 0, 1), z_dir=(0, 1, 0))) as zaokr_glenie6_piece_1:
        with BuildLine():
            CenterArc((39.484680574, 40), ZAOKR_GLENIE6_R, 189.206896221, 80.793103779)
            Line((0, 33.6), (0, 0))
            Line((0, 0), (39.484680574, 0))
        make_face()
    extrude(amount=202.423402868, mode=Mode.SUBTRACT)
    with BuildSketch(Plane(origin=(-92.96044053, -98.711701434, 40.008824838), x_dir=(1, 0, 0), z_dir=(0, 1, 0))) as zaokr_glenie6_piece_2:
        with BuildLine():
            CenterArc((40, 39.484680574), ZAOKR_GLENIE6_R, 180, 80.793103779)
            Line((0, 39.484680574), (0, 0))
            Line((0, 0), (33.6, 0))
        make_face()
    extrude(amount=202.423402868, mode=Mode.SUBTRACT)

    # Zaokrąglenie7
    zaokr_glenie7_edges = [part.edges().sort_by_distance(p)[0] for p in [
        (-72.36044053, -10, -105.487060622),
        (-72.36044053, -10, 35.504710297),
    ]]
    fillet(zaokr_glenie7_edges, radius=ZAOKR_GLENIE7_R)

    # Zaokrąglenie10
    zaokr_glenie10_edges = [part.edges().sort_by_distance(p)[0] for p in [
        (-59.36044053, -7.5, -109.991175162),
        (-59.36044053, -7.5, 40.008824838),
    ]]
    fillet(zaokr_glenie10_edges, radius=ZAOKR_GLENIE10_R)

    # Zaokrąglenie11
    zaokr_glenie11_edges = [part.edges().sort_by_distance(p)[0] for p in [
        (-65.66044053, -7.5, 24.008824838),
        (-65.66044053, -7.5, -93.991175162),
        (-65.66044053, -7.5, -63.491175162),
        (-65.66044053, -7.5, -6.491175162),
    ]]
    fillet(zaokr_glenie11_edges, radius=ZAOKR_GLENIE11_R)

    # Szkic6 → Dodanie-wyciągnięcie4 (add)
    with BuildSketch(Plane(origin=(0, 5, 0), x_dir=(1, 0, 0), z_dir=(0, 1, 0)).offset(DODANIE_WYCI_GNI_CIE4_START)):
        with Locations(Location((-50.66044053, 34.991175162, 0), (0, 0, 270))):
            Circle(SZKIC6_R)
        with Locations(Location((-50.66044053, 34.991175162, 0), (0, 0, 270))):
            Circle(SZKIC6_R_2, mode=Mode.SUBTRACT)
    extrude(amount=DODANIE_WYCI_GNI_CIE4_DEPTH)

    # Szkic7 → Dodanie-wyciągnięcie5 (add)
    with BuildSketch(Plane.XZ):
        with BuildLine():
            Line((-72.36044053, -15.386088635), (-72.36044053, -54.59626169))
            ThreePointArc((-72.36044053, -54.59626169), (-71.743123963, -53.672382157), (-70.653333749, -53.889154909))
            Line((-70.653333749, -53.889154909), (-68.051313495, -56.491175162))
            Line((-68.051313495, -56.491175162), (-48.66044053, -56.491175162))
            ThreePointArc((-48.66044053, -56.491175162), (-46.539120187, -57.369854819), (-45.66044053, -59.491175162))
            Line((-45.66044053, -59.491175162), (-45.66044053, -60.491175162))
            ThreePointArc((-45.66044053, -60.491175162), (-46.539120187, -62.612495506), (-48.66044053, -63.491175162))
            Line((-48.66044053, -63.491175162), (-47.454451852, -63.491175162))
            ThreePointArc((-47.454451852, -63.491175162), (-42.612813728, -62.688306572), (-38.289468826, -60.365647199))
            Line((-38.289468826, -60.365647199), (-35.969263011, -58.574860471))
            ThreePointArc((-35.969263011, -58.574860471), (-35.776228908, -58.429559413), (-35.579740808, -58.288964287))
            ThreePointArc((-35.579740808, -58.288964287), (-30.861747064, -52.924289923), (-29.16044053, -45.985647975))
            Line((-29.16044053, -45.985647975), (-29.16044053, -23.99670235))
            ThreePointArc((-29.16044053, -23.99670235), (-30.861747064, -17.058060401), (-35.579740808, -11.693386037))
            ThreePointArc((-35.579740808, -11.693386037), (-35.776228908, -11.552790912), (-35.969263011, -11.407489853))
            Line((-35.969263011, -11.407489853), (-38.289468826, -9.616703126))
            ThreePointArc((-38.289468826, -9.616703126), (-42.612813728, -7.294043752), (-47.454451852, -6.491175162))
            Line((-47.454451852, -6.491175162), (-48.66044053, -6.491175162))
            ThreePointArc((-48.66044053, -6.491175162), (-46.539120187, -7.369854819), (-45.66044053, -9.491175162))
            Line((-45.66044053, -9.491175162), (-45.66044053, -10.491175162))
            ThreePointArc((-45.66044053, -10.491175162), (-46.539120187, -12.612495506), (-48.66044053, -13.491175162))
            Line((-48.66044053, -13.491175162), (-68.051313495, -13.491175162))
            Line((-68.051313495, -13.491175162), (-70.653333749, -16.093195416))
            ThreePointArc((-70.653333749, -16.093195416), (-71.743123963, -16.309968167), (-72.36044053, -15.386088635))
        make_face()
        with Locations(Location((-50.66044053, -34.991175162, 0), (0, 0, 270))):
            Circle(SZKIC7_R, mode=Mode.SUBTRACT)
        with Locations(Location((-66.16044053, -19.491175162, 0), (0, 0, 270))):
            Circle(SZKIC7_R_2, mode=Mode.SUBTRACT)
        with Locations(Location((-66.16044053, -50.491175162, 0), (0, 0, 270))):
            Circle(SZKIC7_R_2, mode=Mode.SUBTRACT)
        with Locations(Location((-35.16044053, -50.491175162, 0), (0, 0, 270))):
            Circle(SZKIC7_R_2, mode=Mode.SUBTRACT)
        with Locations(Location((-35.16044053, -19.491175162, 0), (0, 0, 270))):
            Circle(SZKIC7_R_2, mode=Mode.SUBTRACT)
    extrude(amount=DODANIE_WYCI_GNI_CIE5_DEPTH)

    # Wytnij-wyciągnięcie4: up to this cylinder (the profile starts outside it)
    wytnij_wyci_gni_cie4_end = Plane(origin=(-60.594472333, -7.5, 32.008824838), z_dir=(0, -1, 0)) * Cylinder(WYTNIJ_WYCI_GNI_CIE4_END_RADIUS, 250.526, mode=Mode.PRIVATE)
    # Szkic9 → Wytnij-wyciągnięcie4 (cut, up to the surface)
    with BuildSketch(Plane(origin=(-52.36044053, 0, 0), x_dir=(0, 0, -1), z_dir=(1, 0, 0)), mode=Mode.PRIVATE) as wytnij_wyci_gni_cie4_sk1:
        with Locations((-32.008824838, -7.5)):
            Circle(SZKIC9_R)
    wytnij_wyci_gni_cie4_tool1 = extrude(wytnij_wyci_gni_cie4_sk1.sketch, amount=-WYTNIJ_WYCI_GNI_CIE4_REACH, mode=Mode.PRIVATE) - wytnij_wyci_gni_cie4_end
    add(wytnij_wyci_gni_cie4_tool1.solids().sort_by_distance((-52.360441, -7.5, 32.008825))[0], mode=Mode.SUBTRACT)

    # Wytnij-wyciągnięcie5: up to this cylinder (the profile starts outside it)
    wytnij_wyci_gni_cie5_end = Plane(origin=(-60.594472333, -7.5, -101.991175162), z_dir=(0, -1, 0)) * Cylinder(WYTNIJ_WYCI_GNI_CIE5_END_RADIUS, 250.526, mode=Mode.PRIVATE)
    # Szkic9<3> → Wytnij-wyciągnięcie5 (cut, up to the surface)
    with BuildSketch(Plane(origin=(-52.36044053, 0, 0), x_dir=(0, 0, -1), z_dir=(1, 0, 0)), mode=Mode.PRIVATE) as wytnij_wyci_gni_cie5_sk1:
        with Locations((101.991175162, -7.5)):
            Circle(SZKIC9_3_R)
    wytnij_wyci_gni_cie5_tool1 = extrude(wytnij_wyci_gni_cie5_sk1.sketch, amount=-WYTNIJ_WYCI_GNI_CIE5_REACH, mode=Mode.PRIVATE) - wytnij_wyci_gni_cie5_end
    add(wytnij_wyci_gni_cie5_tool1.solids().sort_by_distance((-52.360441, -7.5, -101.991175))[0], mode=Mode.SUBTRACT)


solid = part.part
